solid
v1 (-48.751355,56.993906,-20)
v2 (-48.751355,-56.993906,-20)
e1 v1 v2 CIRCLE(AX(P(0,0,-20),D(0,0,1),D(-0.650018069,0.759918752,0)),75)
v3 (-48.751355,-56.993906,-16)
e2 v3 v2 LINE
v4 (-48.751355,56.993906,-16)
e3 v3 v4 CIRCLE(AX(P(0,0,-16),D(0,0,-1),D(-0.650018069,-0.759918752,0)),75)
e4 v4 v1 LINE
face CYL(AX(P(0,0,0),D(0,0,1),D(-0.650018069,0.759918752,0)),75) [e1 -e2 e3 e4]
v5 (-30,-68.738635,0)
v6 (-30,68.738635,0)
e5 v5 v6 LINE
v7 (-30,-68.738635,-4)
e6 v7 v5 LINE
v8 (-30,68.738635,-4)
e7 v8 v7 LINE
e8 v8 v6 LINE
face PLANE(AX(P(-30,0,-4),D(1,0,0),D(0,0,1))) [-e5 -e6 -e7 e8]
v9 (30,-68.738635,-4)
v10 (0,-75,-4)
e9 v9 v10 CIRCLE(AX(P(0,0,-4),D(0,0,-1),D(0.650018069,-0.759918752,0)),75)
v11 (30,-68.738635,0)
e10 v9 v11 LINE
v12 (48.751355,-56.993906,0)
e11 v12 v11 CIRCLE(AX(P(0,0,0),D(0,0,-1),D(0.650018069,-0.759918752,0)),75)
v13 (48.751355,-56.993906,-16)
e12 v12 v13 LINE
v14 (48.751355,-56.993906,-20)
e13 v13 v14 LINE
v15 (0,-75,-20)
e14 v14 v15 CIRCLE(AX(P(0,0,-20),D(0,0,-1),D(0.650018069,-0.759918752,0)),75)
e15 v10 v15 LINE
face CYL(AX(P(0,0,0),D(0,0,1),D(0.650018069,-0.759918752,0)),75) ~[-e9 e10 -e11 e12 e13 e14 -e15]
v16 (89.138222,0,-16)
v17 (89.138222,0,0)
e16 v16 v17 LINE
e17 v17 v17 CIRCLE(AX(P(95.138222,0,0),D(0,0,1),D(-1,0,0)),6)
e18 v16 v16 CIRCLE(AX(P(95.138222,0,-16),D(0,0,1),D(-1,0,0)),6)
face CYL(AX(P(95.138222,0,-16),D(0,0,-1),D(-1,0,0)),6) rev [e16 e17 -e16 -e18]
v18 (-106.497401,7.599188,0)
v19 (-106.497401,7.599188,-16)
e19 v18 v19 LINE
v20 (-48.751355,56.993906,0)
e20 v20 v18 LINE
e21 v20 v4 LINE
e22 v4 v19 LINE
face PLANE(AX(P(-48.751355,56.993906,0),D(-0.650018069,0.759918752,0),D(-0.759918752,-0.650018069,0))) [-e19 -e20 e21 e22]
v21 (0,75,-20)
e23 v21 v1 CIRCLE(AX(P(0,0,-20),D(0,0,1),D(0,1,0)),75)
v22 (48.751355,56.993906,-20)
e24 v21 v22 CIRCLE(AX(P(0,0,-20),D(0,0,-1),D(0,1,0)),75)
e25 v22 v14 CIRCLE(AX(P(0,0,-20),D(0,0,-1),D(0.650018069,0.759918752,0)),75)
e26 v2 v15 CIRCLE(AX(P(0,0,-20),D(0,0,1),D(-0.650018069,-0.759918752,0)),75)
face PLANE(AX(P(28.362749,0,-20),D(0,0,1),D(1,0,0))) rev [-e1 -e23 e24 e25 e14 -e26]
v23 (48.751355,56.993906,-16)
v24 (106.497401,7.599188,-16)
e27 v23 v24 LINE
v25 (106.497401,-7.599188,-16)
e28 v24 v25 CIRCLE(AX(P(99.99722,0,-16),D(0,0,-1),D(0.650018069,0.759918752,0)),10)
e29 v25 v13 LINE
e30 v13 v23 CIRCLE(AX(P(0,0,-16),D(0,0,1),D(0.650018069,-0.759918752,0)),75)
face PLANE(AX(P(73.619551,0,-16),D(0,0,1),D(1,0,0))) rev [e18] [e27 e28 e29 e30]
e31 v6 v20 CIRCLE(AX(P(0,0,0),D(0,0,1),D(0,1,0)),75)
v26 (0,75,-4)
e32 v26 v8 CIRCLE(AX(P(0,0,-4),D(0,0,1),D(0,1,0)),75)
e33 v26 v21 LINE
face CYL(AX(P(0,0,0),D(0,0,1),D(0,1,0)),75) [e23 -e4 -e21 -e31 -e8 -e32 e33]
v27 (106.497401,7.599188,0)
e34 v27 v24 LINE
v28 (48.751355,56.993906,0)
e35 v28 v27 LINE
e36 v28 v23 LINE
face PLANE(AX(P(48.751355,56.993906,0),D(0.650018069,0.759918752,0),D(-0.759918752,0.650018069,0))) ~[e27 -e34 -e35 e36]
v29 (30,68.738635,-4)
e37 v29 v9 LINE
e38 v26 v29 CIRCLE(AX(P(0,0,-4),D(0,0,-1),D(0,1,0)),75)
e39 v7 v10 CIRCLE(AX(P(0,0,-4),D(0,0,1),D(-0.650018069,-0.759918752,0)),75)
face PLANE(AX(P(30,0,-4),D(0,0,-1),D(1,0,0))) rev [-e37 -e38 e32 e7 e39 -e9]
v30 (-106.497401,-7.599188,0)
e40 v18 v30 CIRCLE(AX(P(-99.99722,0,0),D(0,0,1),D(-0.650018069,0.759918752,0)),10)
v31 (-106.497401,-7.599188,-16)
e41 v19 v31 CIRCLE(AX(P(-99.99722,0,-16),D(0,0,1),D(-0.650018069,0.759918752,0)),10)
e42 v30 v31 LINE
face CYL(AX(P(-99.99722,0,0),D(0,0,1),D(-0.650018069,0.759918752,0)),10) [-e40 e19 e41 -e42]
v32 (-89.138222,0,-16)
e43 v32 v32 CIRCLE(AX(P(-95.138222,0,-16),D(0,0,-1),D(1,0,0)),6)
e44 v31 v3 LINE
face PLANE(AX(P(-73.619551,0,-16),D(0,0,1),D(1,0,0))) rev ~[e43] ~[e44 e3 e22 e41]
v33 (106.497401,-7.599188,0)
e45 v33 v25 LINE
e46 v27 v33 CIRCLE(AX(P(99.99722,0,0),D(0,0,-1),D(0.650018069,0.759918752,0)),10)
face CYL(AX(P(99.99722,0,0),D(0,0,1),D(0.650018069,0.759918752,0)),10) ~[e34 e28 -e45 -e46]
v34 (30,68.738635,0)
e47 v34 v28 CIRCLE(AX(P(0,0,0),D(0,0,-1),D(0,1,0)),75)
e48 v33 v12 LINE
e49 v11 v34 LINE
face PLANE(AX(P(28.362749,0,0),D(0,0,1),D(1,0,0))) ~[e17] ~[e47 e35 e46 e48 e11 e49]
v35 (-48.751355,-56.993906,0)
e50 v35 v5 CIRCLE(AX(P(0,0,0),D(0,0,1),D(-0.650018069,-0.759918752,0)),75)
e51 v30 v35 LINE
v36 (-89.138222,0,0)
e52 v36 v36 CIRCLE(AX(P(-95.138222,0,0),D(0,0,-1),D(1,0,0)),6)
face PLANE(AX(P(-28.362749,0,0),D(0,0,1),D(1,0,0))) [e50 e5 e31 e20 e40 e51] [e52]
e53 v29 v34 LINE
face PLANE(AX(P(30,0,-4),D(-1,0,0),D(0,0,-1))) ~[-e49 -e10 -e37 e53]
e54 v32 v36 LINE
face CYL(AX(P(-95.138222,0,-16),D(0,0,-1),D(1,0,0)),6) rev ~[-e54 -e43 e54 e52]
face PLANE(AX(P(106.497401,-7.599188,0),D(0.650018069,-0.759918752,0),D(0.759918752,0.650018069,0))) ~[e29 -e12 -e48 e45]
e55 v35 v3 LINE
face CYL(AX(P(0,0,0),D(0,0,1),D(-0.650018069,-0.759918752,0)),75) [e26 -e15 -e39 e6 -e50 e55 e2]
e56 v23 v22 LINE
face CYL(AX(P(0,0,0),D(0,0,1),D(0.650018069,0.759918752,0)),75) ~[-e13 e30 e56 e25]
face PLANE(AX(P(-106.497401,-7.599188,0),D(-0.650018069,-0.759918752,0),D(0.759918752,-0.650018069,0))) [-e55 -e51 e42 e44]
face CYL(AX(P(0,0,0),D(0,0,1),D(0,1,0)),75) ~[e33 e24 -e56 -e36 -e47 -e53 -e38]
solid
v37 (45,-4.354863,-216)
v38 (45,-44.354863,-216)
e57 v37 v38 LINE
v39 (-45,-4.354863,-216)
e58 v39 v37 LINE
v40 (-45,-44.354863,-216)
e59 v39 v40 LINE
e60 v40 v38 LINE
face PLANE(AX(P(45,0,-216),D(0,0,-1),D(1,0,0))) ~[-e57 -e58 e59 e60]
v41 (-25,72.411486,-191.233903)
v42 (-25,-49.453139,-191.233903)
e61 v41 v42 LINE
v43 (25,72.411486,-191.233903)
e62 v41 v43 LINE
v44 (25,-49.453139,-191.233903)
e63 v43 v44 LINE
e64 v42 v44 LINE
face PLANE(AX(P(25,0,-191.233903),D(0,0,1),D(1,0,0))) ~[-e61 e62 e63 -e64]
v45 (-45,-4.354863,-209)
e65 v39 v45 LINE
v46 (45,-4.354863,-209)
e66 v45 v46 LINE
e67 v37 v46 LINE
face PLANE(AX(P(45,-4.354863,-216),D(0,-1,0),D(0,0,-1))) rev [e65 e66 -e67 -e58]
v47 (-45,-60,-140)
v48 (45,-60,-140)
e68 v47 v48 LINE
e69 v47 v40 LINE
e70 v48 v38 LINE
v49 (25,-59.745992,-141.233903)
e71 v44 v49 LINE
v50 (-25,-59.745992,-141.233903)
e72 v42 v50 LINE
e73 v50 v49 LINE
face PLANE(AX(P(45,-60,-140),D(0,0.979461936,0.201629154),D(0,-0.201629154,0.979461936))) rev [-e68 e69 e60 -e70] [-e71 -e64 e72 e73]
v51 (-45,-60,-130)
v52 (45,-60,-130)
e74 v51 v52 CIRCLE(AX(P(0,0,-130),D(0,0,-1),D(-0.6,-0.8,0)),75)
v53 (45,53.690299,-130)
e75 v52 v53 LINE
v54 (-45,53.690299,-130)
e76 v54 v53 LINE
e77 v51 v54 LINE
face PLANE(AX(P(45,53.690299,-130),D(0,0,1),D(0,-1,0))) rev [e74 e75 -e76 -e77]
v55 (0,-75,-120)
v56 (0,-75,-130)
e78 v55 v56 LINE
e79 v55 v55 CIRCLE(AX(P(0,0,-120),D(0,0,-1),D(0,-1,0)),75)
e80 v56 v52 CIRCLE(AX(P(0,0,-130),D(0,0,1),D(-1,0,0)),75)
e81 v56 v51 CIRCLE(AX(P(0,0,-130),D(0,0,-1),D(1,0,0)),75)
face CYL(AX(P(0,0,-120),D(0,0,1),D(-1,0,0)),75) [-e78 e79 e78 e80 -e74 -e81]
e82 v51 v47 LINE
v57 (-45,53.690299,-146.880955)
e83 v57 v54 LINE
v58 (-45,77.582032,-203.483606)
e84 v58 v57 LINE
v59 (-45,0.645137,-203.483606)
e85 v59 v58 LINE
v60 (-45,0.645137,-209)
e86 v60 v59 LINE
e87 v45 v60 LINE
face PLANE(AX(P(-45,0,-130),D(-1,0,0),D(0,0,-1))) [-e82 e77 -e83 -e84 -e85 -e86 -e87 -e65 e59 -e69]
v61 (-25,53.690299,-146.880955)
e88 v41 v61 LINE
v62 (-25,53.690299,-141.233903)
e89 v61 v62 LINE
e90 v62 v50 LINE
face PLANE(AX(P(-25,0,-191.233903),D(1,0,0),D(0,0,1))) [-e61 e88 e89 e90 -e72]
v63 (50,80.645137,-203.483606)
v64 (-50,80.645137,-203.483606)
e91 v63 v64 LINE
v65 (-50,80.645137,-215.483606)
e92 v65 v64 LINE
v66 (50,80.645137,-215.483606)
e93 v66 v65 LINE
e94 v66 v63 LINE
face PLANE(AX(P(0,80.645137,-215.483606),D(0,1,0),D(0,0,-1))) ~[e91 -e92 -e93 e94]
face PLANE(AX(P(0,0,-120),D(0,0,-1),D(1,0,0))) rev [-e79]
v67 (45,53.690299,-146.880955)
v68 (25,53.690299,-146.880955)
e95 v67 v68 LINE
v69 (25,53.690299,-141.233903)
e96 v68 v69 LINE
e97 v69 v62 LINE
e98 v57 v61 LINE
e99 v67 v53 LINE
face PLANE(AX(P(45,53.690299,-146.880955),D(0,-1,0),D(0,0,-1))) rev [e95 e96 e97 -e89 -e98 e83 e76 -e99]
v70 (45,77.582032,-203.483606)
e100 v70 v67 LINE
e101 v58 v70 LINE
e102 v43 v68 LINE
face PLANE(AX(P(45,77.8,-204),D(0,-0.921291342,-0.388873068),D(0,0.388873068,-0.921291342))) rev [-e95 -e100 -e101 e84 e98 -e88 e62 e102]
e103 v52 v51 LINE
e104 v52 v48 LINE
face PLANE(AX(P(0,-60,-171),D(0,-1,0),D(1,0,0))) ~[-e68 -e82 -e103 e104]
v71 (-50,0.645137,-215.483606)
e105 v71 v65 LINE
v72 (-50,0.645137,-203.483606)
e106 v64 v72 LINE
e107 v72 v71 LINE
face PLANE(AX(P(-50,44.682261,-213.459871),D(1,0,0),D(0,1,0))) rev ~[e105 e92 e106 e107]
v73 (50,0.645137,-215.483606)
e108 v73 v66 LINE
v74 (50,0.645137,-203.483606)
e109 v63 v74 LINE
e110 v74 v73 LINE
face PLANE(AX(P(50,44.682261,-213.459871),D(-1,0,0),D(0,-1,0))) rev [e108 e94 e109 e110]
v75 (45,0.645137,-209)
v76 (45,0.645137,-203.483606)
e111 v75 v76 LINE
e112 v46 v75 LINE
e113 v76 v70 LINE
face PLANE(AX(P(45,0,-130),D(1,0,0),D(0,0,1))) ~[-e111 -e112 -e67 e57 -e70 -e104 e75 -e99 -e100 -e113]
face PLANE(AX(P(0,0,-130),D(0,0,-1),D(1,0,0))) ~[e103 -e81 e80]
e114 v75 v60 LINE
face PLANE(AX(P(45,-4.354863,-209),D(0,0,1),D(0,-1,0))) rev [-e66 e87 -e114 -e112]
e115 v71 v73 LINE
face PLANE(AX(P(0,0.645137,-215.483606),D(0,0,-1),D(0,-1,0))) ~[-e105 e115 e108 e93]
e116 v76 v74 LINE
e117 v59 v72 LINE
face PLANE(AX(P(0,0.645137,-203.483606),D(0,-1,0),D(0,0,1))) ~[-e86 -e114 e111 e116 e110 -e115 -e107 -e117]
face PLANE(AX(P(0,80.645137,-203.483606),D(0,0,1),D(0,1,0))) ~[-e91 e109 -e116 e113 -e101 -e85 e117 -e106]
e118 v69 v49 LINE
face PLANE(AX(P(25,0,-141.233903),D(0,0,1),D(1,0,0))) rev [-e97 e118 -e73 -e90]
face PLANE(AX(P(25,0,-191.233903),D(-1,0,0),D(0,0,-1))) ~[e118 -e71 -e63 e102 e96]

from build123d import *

# Parameters (mm, degrees)
F1_DEPTH  = 16
F2_DEPTH  = 20
F3_R      = 6
F4_DEPTH  = 16
F5_W      = 30
F5_H      = 4
F6_DEPTH  = 75
F8_R      = 75
F9_DEPTH  = 10
F12_DEPTH = 60
F13_DEPTH = 77.8
F15_DEPTH = 100
F16_W     = 77.1548634648
F16_H     = 3
F17_DEPTH = 45
F19_DEPTH = 50
F20_W     = 25
F20_H     = 50
F21_DEPTH = 80
F22_DEPTH = 80


with BuildPart() as f1:
    # F0 (on Top) → F1 (new body)
    with BuildSketch(Plane.XY):
        with BuildLine():
            ThreePointArc((-48.751355202, -56.9939063933), (-75, 0), (-48.751355202, 56.9939063933))
            Line((-48.751355202, 56.9939063933), (-106.4974008694, 7.5991875191))
            ThreePointArc((-106.4974008694, 7.5991875191), (-109.9972201758, 0), (-106.4974008694, -7.5991875191))
            Line((-106.4974008694, -7.5991875191), (-48.751355202, -56.9939063933))
        make_face()
    extrude(amount=-F1_DEPTH)

    # F0 (on Top) → F2 (join)
    with BuildSketch(Plane.XY):
        with BuildLine():
            Line((0, -75), (0, 75))
            ThreePointArc((0, 75), (-25.9851594232, 70.354612427), (-48.751355202, 56.9939063933))
            ThreePointArc((-48.751355202, 56.9939063933), (-75, 0), (-48.751355202, -56.9939063933))
            ThreePointArc((-48.751355202, -56.9939063933), (-25.9851594232, -70.354612427), (0, -75))
        make_face()
    extrude(amount=-F2_DEPTH)

    # F3 (on face) → F4 (cut)
    with BuildSketch(Plane(origin=(0, 0, -16), x_dir=(1, 0, 0), z_dir=(0, 0, -1))):
        with Locations((-95.1382219791, 0)):
            Circle(F3_R)
    extrude(amount=-F4_DEPTH, mode=Mode.SUBTRACT)

    # F5 (on Front) → F6 (cut, symmetric)
    with BuildSketch(Plane.XZ):
        with Locations((-15, -2)):
            Rectangle(F5_W, F5_H)
    extrude(amount=F6_DEPTH, both=True, mode=Mode.SUBTRACT)

    # F7: F1 across face


with BuildPart() as f1_1:
    add(f1.part)
    add(f1.part.mirror(Plane(origin=(0, 0, -12), x_dir=(0, 1, 0), z_dir=(1, 0, 0))))


with BuildPart() as f9:
    # F8 (on face) → F9 (new body)
    with BuildSketch(Plane(origin=(0, 0, -20), x_dir=(1, 0, 0), z_dir=(0, 0, -1))):
        Circle(F8_R)
    extrude(amount=F9_DEPTH)


with BuildPart() as f9_1:
    # F10: moved
    add(f9.part.moved(Location((0, 0, -100))))

    # F11 (on Front) → F12 (join)
    with BuildSketch(Plane.XZ):
        Polygon((0, -126), (-45, -126), (-45, -216), (45, -216), (45, -126), align=None)
    extrude(amount=F12_DEPTH)

    # F13 (add): a face of the model
    f13_faces = [f9_1.faces().sort_by_distance(p)[0] for p in [
        (0, 0, -173),
    ]]
    extrude(f13_faces, amount=F13_DEPTH)

    # F14 (on face) → F15 (cut)
    with BuildSketch(Plane.XY.offset(-120)):
        with BuildLine():
            ThreePointArc((75, 0), (53.033008589, -53.033008589), (0, -75))
            Line((0, -75), (93.311317265, -75))
            Line((93.311317265, -75), (93.311317265, 95.2438786626))
            Line((93.311317265, 95.2438786626), (0, 95.2438786626))
            Line((0, 95.2438786626), (0, 75))
            ThreePointArc((0, 75), (53.033008589, 53.033008589), (75, 0))
        make_face()
        with BuildLine():
            Line((0, 75), (0, -75))
            ThreePointArc((0, -75), (53.033008589, -53.033008589), (75, 0))
            ThreePointArc((75, 0), (53.033008589, 53.033008589), (0, 75))
        make_face()
    extrude(amount=-F15_DEPTH, mode=Mode.SUBTRACT)

    # F16 (on face) → F17 (cut)
    with BuildSketch(Plane(origin=(-45, 0, 0), x_dir=(0, -1, 0), z_dir=(-1, 0, 0))):
        Polygon((-77.8, -130), (-77.8, -204), (-53.6902993917, -146.880954504), (-53.6902993917, -130), align=None)
        with Locations((-39.2225682676, -214.5)):
            Rectangle(F16_W, F16_H)
        Polygon((60, -216), (60, -140), (44.3548634648, -216), align=None)
        Polygon((-0.6451365352, -216), (4.3548634648, -216), (4.3548634648, -213), (4.3548634648, -209), (-0.6451365352, -209), (-0.6451365352, -213), align=None)
    extrude(amount=-F17_DEPTH, mode=Mode.SUBTRACT)

    # F18 (on face) → F19 (join)
    with BuildSketch(Plane.YZ):
        Polygon((80.6451365352, -203.4836058617), (77.8, -203.4836058617), (77.5820322808, -203.4836058617), (77.8, -204), (77.8, -213), (0.6451365352, -213), (0.6451365352, -215.4836058617), (80.6451365352, -215.4836058617), align=None)
        Polygon((77.8, -204), (77.5820322808, -203.4836058617), (0.6451365352, -203.4836058617), (0.6451365352, -209), (0.6451365352, -213), (77.8, -213), align=None)
    extrude(amount=-F19_DEPTH)

    # F20 (on Front) → F21 (cut)
    with BuildSketch(Plane.XZ):
        with Locations((-12.5, -166.2339031696)):
            Rectangle(F20_W, F20_H)
    extrude(amount=-F21_DEPTH, mode=Mode.SUBTRACT)

    # F22 (cut): a face of the model
    f22_faces = [f9_1.faces().sort_by_distance(p)[0] for p in [
        (-12.5, 0, -166.2339031696),
    ]]
    extrude(f22_faces, amount=-F22_DEPTH, mode=Mode.SUBTRACT)

    # F23: F9 across face


with BuildPart() as f9_2:
    add(f9_1.part)
    add(f9_1.part.mirror(Plane(origin=(0, 15.3582634866, -203.4262275083), x_dir=(0, 1, 0), z_dir=(1, 0, 0))))


solid = Compound([f1_1.part, f9_2.part])
